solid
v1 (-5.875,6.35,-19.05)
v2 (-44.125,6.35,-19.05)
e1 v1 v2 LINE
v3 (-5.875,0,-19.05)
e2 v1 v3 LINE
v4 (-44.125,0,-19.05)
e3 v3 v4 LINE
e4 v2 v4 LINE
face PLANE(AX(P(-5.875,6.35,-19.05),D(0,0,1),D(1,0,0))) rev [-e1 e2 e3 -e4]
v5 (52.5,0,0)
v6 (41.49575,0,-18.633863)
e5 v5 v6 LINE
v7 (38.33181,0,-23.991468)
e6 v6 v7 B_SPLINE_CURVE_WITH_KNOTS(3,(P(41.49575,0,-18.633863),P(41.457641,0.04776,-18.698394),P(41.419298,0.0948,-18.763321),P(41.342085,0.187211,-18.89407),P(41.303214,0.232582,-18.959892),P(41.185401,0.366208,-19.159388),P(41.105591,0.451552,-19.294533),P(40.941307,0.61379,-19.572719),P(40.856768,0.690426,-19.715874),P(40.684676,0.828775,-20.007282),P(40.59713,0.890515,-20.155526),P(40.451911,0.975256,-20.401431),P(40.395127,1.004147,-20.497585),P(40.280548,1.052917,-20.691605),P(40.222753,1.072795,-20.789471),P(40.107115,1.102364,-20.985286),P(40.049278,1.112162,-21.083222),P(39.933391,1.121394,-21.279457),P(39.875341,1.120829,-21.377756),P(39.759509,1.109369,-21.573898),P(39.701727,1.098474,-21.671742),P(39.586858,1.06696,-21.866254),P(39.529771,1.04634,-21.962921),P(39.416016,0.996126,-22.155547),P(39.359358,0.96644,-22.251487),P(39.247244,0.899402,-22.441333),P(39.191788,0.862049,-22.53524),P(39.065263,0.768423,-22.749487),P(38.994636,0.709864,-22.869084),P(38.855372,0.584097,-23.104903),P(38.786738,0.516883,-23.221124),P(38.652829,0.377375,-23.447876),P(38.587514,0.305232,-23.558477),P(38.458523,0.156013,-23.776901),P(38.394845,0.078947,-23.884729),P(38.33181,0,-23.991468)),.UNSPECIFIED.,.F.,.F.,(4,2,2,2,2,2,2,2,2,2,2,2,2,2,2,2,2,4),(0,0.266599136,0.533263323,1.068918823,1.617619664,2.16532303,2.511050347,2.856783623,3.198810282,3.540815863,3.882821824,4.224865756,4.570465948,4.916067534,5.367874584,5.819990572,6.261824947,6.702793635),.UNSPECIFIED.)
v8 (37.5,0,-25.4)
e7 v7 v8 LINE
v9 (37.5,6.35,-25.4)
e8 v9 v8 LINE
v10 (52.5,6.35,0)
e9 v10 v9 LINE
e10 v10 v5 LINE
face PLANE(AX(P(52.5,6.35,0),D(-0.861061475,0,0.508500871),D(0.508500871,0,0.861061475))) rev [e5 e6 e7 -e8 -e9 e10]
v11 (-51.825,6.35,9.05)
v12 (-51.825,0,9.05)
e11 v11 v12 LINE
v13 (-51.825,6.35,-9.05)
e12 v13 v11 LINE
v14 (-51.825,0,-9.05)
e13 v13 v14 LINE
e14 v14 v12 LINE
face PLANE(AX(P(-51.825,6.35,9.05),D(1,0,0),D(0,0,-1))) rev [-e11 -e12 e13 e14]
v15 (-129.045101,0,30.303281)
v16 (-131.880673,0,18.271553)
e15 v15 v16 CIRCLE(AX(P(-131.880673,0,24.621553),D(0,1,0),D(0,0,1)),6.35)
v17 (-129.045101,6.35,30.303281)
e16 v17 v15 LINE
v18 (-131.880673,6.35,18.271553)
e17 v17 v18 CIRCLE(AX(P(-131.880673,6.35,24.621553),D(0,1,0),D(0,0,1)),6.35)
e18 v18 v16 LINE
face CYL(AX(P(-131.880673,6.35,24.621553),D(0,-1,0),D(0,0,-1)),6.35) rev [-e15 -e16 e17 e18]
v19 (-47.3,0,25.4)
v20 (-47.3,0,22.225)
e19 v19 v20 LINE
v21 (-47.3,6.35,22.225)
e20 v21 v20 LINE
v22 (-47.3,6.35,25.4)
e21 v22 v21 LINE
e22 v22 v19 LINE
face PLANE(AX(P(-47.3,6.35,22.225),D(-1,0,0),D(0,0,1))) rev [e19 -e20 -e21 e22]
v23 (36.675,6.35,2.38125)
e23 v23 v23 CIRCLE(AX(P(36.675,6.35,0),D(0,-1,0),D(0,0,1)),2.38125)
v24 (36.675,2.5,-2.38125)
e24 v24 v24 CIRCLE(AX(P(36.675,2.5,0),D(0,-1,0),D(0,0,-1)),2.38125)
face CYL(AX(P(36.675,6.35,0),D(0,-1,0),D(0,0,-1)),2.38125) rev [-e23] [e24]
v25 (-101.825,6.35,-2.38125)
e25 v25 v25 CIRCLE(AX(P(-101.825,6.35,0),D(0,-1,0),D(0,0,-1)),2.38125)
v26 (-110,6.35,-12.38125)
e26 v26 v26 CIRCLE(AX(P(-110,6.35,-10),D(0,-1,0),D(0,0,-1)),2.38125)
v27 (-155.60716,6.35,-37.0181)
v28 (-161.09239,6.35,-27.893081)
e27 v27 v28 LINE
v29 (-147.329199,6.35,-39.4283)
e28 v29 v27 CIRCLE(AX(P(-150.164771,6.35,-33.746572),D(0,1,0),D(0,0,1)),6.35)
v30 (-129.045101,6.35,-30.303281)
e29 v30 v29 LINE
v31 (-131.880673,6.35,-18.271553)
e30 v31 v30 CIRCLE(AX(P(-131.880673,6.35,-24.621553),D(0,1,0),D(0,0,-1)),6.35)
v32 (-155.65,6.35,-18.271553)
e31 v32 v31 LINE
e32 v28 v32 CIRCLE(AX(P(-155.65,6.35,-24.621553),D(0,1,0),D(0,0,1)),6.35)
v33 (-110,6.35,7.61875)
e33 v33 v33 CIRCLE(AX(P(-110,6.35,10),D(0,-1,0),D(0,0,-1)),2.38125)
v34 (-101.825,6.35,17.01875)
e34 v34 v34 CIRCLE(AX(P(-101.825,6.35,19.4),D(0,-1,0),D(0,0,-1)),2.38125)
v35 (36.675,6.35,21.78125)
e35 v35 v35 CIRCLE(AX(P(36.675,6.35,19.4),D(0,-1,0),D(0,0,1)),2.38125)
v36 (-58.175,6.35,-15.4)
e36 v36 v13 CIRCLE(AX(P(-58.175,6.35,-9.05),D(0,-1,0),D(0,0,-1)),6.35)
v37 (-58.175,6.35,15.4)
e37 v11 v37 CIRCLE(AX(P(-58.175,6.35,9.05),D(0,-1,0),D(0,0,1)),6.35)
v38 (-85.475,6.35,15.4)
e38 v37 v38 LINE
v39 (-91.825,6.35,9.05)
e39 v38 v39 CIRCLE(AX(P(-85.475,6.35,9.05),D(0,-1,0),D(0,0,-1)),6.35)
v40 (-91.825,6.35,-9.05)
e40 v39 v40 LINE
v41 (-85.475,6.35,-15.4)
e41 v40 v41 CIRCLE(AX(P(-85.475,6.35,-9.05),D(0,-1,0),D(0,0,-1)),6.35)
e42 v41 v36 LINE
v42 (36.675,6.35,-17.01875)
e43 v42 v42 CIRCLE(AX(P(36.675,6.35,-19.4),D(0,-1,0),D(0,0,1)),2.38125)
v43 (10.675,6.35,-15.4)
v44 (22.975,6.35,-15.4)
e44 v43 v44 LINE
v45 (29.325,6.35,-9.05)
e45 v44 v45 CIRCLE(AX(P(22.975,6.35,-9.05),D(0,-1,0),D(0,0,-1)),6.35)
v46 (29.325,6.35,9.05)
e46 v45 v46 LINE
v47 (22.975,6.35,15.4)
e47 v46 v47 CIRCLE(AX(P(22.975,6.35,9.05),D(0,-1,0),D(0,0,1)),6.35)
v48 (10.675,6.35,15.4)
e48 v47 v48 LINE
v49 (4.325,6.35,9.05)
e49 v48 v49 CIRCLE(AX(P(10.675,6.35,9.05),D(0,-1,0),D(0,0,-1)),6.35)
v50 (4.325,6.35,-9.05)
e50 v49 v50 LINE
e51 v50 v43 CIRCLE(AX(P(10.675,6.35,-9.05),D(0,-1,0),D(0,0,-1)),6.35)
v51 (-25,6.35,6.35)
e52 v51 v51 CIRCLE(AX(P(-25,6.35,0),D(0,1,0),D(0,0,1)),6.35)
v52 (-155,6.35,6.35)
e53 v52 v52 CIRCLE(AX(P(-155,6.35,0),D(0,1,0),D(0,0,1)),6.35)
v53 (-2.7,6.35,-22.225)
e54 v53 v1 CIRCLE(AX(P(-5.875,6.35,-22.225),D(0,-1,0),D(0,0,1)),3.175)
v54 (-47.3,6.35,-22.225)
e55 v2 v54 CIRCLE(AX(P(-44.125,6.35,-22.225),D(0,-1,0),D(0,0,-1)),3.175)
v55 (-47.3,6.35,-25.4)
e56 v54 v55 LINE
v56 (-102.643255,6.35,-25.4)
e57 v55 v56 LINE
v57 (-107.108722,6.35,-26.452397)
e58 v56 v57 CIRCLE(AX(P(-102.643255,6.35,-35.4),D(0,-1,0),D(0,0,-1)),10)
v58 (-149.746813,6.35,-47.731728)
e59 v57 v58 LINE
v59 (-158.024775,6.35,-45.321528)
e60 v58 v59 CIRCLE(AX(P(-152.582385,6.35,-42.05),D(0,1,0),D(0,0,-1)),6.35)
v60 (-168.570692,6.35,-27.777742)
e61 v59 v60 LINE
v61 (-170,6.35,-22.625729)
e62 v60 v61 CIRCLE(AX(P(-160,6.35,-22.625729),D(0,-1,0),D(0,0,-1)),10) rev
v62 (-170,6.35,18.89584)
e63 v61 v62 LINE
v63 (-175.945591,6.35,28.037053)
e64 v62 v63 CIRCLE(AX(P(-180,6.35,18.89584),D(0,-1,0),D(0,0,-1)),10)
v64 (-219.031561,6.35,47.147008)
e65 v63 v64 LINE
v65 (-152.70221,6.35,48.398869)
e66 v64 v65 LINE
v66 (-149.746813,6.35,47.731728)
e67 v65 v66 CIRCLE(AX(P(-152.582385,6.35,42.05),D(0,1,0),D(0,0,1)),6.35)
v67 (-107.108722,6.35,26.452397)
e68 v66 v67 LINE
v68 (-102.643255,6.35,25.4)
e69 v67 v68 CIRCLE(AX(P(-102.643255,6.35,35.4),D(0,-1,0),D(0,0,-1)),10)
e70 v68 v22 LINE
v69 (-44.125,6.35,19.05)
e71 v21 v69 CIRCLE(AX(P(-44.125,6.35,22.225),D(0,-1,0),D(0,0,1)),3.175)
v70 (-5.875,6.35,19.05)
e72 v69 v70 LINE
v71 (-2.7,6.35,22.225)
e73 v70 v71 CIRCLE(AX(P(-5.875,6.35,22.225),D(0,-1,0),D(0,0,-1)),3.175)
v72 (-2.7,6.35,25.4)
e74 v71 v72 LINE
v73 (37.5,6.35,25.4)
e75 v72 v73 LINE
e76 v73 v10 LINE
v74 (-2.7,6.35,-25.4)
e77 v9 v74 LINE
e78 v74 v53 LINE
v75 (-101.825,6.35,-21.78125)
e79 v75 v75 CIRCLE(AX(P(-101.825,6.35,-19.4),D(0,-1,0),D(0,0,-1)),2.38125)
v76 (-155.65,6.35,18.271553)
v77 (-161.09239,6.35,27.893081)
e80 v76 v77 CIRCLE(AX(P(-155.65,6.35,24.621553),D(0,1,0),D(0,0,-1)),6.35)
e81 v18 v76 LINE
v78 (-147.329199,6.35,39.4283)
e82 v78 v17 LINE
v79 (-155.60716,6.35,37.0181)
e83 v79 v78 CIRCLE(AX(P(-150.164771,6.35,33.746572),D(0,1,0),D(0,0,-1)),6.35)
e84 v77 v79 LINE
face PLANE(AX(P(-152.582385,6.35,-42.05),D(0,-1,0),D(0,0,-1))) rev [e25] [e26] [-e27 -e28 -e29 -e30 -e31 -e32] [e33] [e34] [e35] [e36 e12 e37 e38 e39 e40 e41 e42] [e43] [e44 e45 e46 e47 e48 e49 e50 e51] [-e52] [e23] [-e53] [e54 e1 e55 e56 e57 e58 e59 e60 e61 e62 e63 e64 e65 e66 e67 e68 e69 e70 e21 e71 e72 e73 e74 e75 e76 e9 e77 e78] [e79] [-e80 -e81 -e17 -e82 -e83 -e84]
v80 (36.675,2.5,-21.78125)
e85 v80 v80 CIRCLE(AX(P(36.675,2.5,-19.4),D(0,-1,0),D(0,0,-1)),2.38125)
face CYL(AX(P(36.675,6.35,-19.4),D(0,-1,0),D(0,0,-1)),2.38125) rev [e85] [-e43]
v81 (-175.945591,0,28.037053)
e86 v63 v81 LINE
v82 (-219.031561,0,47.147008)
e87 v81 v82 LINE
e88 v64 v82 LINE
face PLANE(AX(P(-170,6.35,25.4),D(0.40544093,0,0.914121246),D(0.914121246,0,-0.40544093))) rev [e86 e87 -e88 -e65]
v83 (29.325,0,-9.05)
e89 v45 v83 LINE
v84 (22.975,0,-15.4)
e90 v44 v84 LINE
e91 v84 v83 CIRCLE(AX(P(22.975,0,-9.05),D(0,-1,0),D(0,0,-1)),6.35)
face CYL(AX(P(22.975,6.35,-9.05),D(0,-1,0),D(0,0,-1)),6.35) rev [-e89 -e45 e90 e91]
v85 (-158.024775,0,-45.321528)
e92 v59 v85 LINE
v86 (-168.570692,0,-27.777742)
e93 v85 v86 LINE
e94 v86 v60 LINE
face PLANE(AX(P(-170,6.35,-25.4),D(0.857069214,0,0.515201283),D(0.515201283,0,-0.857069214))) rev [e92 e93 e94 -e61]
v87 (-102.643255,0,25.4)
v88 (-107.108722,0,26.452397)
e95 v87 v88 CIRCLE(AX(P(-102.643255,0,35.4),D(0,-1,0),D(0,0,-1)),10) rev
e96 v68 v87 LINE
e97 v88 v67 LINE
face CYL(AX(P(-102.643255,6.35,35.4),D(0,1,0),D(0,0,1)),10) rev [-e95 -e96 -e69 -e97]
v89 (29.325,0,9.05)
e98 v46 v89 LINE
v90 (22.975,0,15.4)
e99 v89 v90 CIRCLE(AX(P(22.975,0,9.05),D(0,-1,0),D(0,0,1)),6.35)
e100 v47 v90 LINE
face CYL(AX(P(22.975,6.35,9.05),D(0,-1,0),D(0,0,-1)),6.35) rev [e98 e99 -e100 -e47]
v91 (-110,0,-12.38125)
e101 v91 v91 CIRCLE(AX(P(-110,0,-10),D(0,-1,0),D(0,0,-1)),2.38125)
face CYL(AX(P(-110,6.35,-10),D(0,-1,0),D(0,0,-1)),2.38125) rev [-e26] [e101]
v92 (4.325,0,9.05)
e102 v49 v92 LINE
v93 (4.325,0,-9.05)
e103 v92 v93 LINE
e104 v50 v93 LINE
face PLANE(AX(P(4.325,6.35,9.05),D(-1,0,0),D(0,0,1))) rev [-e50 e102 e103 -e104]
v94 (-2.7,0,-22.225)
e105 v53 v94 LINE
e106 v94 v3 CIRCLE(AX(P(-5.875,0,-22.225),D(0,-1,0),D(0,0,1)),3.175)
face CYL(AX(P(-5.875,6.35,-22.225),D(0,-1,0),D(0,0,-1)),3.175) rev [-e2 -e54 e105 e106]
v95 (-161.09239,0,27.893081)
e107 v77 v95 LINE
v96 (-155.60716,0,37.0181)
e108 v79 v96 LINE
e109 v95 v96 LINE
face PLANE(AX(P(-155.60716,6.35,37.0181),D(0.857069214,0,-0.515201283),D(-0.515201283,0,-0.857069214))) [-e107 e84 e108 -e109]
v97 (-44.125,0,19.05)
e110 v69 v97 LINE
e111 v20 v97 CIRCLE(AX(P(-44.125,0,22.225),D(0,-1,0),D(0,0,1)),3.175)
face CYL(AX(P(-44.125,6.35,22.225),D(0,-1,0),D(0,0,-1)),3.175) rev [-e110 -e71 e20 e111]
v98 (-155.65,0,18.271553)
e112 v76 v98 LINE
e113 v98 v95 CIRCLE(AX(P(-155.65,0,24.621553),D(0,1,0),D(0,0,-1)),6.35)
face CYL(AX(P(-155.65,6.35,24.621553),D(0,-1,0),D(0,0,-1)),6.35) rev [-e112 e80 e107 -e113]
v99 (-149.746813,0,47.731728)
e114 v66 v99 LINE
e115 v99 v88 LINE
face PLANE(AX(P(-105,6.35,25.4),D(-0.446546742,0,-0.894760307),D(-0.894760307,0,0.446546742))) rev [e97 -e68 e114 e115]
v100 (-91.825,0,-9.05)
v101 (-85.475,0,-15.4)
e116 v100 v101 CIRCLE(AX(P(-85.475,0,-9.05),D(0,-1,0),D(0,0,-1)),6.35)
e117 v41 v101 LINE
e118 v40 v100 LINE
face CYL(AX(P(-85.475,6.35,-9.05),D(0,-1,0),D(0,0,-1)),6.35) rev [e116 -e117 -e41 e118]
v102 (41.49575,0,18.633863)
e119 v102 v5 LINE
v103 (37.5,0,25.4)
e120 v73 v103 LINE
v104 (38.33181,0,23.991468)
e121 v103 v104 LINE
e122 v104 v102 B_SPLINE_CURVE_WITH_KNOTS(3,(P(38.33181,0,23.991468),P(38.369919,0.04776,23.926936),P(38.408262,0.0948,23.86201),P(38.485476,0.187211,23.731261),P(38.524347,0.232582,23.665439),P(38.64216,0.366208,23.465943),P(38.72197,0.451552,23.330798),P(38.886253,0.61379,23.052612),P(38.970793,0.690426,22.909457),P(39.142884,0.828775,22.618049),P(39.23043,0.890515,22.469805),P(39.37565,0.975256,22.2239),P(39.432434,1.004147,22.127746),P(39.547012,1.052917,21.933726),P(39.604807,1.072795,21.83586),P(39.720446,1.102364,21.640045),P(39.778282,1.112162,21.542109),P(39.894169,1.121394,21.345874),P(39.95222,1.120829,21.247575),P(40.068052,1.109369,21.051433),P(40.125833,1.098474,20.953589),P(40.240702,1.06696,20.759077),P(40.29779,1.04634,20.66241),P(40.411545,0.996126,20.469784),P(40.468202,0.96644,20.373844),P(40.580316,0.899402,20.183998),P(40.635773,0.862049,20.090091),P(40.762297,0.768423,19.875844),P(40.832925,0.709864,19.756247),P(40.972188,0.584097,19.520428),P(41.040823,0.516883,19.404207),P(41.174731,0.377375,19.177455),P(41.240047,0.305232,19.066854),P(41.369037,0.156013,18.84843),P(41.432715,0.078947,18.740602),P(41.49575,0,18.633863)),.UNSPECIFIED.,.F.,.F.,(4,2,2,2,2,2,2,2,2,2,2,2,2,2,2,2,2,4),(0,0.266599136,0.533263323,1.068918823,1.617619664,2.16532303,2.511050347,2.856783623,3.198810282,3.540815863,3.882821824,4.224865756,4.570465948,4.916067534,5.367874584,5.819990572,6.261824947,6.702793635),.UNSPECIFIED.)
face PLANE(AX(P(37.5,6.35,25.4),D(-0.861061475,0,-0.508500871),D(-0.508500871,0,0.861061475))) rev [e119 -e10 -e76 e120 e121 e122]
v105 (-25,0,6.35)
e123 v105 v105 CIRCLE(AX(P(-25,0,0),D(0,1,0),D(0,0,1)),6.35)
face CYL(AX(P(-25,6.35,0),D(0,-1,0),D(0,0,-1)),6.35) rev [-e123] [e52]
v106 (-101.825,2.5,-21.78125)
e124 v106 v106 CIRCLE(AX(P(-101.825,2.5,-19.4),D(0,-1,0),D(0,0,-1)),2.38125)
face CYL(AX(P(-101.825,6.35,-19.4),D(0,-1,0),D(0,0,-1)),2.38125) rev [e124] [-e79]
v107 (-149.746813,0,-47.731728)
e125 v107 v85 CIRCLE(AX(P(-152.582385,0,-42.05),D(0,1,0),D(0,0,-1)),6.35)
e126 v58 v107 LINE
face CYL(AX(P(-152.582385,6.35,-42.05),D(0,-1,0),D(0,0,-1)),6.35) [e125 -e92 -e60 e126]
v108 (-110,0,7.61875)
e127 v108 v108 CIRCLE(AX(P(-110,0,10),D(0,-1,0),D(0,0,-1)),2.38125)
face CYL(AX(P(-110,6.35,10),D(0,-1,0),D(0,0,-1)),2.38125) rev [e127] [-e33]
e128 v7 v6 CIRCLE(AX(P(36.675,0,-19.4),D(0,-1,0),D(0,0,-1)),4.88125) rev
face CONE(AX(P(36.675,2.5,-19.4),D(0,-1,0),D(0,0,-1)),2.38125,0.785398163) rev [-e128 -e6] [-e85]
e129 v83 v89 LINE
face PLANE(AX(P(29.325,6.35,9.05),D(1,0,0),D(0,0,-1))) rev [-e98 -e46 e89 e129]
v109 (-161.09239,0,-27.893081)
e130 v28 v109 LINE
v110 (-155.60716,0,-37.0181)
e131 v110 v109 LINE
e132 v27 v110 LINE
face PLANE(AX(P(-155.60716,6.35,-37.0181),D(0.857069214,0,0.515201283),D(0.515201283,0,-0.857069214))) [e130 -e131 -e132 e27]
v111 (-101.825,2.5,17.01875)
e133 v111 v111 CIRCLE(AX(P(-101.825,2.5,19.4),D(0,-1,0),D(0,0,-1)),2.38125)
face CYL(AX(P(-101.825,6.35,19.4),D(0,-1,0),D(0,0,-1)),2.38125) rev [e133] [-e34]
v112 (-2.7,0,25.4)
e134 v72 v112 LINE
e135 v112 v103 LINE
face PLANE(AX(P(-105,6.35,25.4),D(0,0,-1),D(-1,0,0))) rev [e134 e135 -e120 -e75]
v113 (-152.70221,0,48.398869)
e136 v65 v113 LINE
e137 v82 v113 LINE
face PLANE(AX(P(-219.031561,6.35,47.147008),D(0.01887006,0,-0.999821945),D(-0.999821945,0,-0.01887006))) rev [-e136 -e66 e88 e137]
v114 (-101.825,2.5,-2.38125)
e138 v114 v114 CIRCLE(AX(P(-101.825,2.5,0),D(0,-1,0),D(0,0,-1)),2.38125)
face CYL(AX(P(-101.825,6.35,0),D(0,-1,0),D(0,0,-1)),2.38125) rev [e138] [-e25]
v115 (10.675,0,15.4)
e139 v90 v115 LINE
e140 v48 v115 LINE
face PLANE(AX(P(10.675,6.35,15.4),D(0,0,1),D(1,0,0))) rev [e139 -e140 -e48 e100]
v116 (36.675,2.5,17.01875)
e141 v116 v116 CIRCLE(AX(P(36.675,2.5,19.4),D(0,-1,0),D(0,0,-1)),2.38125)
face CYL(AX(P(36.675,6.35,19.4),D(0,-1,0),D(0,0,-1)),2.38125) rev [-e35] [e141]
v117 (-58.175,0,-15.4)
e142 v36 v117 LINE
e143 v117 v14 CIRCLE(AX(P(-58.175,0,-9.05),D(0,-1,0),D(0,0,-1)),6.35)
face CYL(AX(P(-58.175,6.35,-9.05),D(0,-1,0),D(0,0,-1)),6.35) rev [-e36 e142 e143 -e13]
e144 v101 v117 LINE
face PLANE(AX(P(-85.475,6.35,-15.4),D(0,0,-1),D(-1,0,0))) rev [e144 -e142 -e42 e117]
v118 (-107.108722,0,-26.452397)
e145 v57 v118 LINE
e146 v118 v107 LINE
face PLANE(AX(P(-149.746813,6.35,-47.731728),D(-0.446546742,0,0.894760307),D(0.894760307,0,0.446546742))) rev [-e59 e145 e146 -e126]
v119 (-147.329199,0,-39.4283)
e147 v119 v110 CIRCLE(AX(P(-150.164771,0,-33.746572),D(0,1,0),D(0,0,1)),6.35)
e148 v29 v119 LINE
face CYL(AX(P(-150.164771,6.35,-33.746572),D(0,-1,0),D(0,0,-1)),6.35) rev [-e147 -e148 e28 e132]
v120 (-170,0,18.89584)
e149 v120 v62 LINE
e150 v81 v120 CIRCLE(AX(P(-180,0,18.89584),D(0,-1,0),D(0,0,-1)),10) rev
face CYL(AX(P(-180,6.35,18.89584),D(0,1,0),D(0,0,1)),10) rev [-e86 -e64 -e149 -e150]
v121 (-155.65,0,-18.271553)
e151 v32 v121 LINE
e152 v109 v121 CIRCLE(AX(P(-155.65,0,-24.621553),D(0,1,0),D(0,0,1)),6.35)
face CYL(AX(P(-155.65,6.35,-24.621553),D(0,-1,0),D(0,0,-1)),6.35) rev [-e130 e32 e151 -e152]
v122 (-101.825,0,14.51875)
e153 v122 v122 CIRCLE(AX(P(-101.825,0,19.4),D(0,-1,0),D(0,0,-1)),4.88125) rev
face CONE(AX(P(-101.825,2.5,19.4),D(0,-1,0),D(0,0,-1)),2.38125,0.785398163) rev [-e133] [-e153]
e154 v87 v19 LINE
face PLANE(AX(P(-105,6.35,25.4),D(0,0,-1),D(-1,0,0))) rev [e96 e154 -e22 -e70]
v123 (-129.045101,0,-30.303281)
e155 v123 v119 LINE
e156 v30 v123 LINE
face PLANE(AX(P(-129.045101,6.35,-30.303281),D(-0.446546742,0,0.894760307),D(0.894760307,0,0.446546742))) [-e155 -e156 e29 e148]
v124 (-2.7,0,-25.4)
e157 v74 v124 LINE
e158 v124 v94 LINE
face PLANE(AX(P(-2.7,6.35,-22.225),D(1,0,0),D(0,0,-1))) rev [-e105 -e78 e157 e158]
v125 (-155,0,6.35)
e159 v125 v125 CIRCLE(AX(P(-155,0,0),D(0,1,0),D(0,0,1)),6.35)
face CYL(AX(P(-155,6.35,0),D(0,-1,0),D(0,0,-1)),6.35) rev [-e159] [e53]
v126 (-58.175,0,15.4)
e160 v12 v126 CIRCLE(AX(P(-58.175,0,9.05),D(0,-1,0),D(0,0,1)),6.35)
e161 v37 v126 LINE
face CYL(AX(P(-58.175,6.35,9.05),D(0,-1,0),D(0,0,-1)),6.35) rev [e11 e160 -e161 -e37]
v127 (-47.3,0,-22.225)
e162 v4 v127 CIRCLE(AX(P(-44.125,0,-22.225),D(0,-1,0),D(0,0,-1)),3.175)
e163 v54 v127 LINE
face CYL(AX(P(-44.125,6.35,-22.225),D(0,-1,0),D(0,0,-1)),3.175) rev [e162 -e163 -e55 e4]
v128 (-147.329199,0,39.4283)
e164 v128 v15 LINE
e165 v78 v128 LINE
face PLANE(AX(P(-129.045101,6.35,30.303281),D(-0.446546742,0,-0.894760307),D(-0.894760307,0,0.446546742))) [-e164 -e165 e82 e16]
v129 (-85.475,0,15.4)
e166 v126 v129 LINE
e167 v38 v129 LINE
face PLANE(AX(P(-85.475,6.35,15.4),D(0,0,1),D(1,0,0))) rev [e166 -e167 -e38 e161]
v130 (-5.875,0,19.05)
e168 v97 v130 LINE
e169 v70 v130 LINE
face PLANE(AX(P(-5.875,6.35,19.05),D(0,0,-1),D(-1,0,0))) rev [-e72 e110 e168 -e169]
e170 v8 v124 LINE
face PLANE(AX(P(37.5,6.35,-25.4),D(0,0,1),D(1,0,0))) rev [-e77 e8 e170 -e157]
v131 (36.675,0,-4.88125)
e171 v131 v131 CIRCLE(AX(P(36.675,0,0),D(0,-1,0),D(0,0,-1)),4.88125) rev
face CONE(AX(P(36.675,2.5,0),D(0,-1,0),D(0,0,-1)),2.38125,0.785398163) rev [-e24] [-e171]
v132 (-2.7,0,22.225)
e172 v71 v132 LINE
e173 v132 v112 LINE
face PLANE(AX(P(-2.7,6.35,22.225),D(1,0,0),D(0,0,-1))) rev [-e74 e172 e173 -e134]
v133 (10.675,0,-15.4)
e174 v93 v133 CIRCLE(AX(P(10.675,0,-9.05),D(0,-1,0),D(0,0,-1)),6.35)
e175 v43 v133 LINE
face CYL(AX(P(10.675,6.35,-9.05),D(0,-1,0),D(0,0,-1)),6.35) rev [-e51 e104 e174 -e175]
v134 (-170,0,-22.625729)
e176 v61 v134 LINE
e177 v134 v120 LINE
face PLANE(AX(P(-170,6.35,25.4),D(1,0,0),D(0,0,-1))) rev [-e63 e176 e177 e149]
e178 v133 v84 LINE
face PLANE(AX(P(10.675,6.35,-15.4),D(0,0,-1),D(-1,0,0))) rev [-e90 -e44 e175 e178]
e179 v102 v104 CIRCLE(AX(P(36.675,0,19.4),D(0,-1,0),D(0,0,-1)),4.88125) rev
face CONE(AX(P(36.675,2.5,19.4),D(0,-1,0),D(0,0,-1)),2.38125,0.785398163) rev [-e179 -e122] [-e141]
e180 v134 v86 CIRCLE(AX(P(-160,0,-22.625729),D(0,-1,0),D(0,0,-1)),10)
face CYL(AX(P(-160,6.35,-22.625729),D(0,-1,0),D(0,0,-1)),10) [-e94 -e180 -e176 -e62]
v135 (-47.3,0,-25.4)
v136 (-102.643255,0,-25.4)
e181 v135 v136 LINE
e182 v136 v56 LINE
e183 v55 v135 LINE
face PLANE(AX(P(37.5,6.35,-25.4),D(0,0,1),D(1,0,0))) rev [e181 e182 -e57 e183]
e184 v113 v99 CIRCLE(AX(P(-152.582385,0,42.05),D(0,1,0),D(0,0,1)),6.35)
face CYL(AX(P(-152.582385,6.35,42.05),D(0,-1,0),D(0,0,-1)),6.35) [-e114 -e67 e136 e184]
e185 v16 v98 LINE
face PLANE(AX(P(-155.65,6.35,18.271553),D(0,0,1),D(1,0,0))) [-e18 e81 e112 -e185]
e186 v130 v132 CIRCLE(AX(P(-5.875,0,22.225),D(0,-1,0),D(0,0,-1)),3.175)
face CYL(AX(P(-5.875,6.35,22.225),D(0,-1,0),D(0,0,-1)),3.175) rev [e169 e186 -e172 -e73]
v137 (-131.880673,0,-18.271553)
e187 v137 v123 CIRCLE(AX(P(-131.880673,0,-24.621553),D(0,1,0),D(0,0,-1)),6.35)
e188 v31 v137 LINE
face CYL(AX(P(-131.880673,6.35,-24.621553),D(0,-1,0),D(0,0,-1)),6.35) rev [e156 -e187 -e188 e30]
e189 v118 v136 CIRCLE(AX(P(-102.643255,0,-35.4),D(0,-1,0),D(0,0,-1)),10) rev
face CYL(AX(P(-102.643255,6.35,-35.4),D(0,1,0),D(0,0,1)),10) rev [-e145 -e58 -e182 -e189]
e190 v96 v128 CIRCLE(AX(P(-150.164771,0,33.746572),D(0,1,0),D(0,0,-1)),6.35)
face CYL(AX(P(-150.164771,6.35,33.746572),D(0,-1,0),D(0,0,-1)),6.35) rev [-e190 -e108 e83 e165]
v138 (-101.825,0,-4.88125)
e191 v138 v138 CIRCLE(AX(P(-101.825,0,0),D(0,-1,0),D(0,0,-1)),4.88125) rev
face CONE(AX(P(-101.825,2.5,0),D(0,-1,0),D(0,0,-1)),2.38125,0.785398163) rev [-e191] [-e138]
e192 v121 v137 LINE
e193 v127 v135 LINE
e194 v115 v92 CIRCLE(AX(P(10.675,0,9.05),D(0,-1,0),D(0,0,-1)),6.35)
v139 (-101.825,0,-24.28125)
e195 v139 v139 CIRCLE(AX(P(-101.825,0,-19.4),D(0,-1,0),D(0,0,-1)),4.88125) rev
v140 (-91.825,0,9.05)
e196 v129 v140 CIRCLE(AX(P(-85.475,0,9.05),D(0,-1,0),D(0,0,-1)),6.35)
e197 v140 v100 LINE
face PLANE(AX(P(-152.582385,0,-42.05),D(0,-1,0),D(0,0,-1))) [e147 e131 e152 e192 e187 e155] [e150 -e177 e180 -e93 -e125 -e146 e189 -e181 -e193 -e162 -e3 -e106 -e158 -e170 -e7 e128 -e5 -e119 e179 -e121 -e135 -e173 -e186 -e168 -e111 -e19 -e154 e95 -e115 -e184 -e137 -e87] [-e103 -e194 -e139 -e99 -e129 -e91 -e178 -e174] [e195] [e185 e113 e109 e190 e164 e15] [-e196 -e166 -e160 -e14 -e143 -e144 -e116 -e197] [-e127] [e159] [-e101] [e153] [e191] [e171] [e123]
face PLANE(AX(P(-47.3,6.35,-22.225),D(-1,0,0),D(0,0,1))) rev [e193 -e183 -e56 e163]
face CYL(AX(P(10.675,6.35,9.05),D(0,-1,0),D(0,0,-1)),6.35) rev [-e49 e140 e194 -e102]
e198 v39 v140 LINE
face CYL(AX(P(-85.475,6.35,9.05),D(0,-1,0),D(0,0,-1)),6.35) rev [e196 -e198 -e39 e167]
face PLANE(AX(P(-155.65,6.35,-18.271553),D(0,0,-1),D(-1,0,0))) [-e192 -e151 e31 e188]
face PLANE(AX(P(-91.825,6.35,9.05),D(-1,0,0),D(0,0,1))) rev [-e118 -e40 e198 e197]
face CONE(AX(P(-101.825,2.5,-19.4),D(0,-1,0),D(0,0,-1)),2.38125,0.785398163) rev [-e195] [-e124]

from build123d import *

# Parameters (mm, degrees)
CROQUIS1_R              = 6.35
SALIENTE_EXTRUIR1_DEPTH = 6.35
REDONDEO1_R             = 10
CORTAR_EXTRUIR2_DEPTH   = 225.405229946
CORTAR_EXTRUIR3_DEPTH   = 225.405229946
CROQUIS7_R              = 2.38125
CORTAR_EXTRUIR4_DEPTH   = 225.405229946
CROQUIS8_R              = 2.38125
CORTAR_EXTRUIR5_DEPTH   = 225.405229946
CHAFL_N1_SIZE           = 2.5


with BuildPart() as part:
    # Croquis1 → Saliente-Extruir1 (new body)
    with BuildSketch(Plane(origin=(0, 0, 0), x_dir=(1, 0, 0), z_dir=(0, 1, 0))):
        with BuildLine():
            Line((37.5, -25.4), (52.5, 0))
            Line((52.5, 0), (37.5, 25.4))
            Line((37.5, 25.4), (-105, 25.4))
            Line((-105, 25.4), (-149.746813481, 47.731727951))
            ThreePointArc((-149.746813481, 47.731727951), (-154.357530471, 48.146831931), (-158.024774803, 45.321528145))
            Line((-158.024774803, 45.321528145), (-170, 25.4))
            Line((-170, 25.4), (-170, -25.4))
            Line((-170, -25.4), (-219.03156103, -47.147007635))
            Line((-219.03156103, -47.147007635), (-152.702210171, -48.398869348))
            ThreePointArc((-152.702210171, -48.398869348), (-151.184140049, -48.244143221), (-149.746813481, -47.731727951))
            Line((-149.746813481, -47.731727951), (-105, -25.4))
            Line((-105, -25.4), (37.5, -25.4))
        make_face()
        with Locations(Location((-155, 0, 0), (0, 0, 270))):
            Circle(CROQUIS1_R, mode=Mode.SUBTRACT)
        with Locations(Location((-25, 0, 0), (0, 0, 270))):
            Circle(CROQUIS1_R, mode=Mode.SUBTRACT)
        with BuildLine():
            Line((-129.045100716, 30.303281185), (-147.329198773, 39.428299747))
            ThreePointArc((-147.329198773, 39.428299747), (-151.939915763, 39.843403727), (-155.607160095, 37.018099941))
            Line((-155.607160095, 37.018099941), (-161.092389512, 27.893081378))
            ThreePointArc((-161.092389512, 27.893081378), (-161.177056347, 21.495189828), (-155.65, 18.271553233))
            Line((-155.65, 18.271553233), (-131.880672526, 18.271553233))
            ThreePointArc((-131.880672526, 18.271553233), (-125.699998109, 23.164925706), (-129.045100716, 30.303281185))
        make_face(mode=Mode.SUBTRACT)
        with BuildLine():
            Line((-129.045100716, -30.303281185), (-147.329198773, -39.428299747))
            ThreePointArc((-147.329198773, -39.428299747), (-151.939915763, -39.843403727), (-155.607160095, -37.018099941))
            Line((-155.607160095, -37.018099941), (-161.092389512, -27.893081378))
            ThreePointArc((-161.092389512, -27.893081378), (-161.177056347, -21.495189828), (-155.65, -18.271553233))
            Line((-155.65, -18.271553233), (-131.880672526, -18.271553233))
            ThreePointArc((-131.880672526, -18.271553233), (-125.699998109, -23.164925706), (-129.045100716, -30.303281185))
        make_face(mode=Mode.SUBTRACT)
    extrude(amount=SALIENTE_EXTRUIR1_DEPTH)

    # Redondeo1
    redondeo1_edges = [part.edges().sort_by_distance(p)[0] for p in [
        (-105, 3.175, -25.4),
        (-170, 3.175, -25.4),
        (-170, 3.175, 25.4),
        (-105, 3.175, 25.4),
    ]]
    fillet(redondeo1_edges, radius=REDONDEO1_R)

    # Croquis5 → Cortar-Extruir2 (cut, through all)
    with BuildSketch(Plane.XZ):
        with BuildLine():
            Line((-5.875, 19.05), (-44.125, 19.05))
            ThreePointArc((-44.125, 19.05), (-46.37006403, 19.97993597), (-47.3, 22.225))
            Line((-47.3, 22.225), (-47.3, 25.4))
            Line((-47.3, 25.4), (-44.125, 25.4))
            Line((-44.125, 25.4), (-5.875, 25.4))
            Line((-5.875, 25.4), (-2.7, 25.4))
            Line((-2.7, 25.4), (-2.7, 22.225))
            ThreePointArc((-2.7, 22.225), (-3.62993597, 19.97993597), (-5.875, 19.05))
        make_face()
        with BuildLine():
            Line((-5.875, -19.05), (-44.125, -19.05))
            ThreePointArc((-44.125, -19.05), (-46.37006403, -19.97993597), (-47.3, -22.225))
            Line((-47.3, -22.225), (-47.3, -25.4))
            Line((-47.3, -25.4), (-44.125, -25.4))
            Line((-44.125, -25.4), (-5.875, -25.4))
            Line((-5.875, -25.4), (-2.7, -25.4))
            Line((-2.7, -25.4), (-2.7, -22.225))
            ThreePointArc((-2.7, -22.225), (-3.62993597, -19.97993597), (-5.875, -19.05))
        make_face()
    extrude(amount=-CORTAR_EXTRUIR2_DEPTH, mode=Mode.SUBTRACT)

    # Croquis6 → Cortar-Extruir3 (cut, through all)
    with BuildSketch(Plane.XZ):
        with BuildLine():
            Line((-85.475, 15.4), (-58.175, 15.4))
            ThreePointArc((-58.175, 15.4), (-53.684871939, 13.540128061), (-51.825, 9.05))
            Line((-51.825, 9.05), (-51.825, -9.05))
            ThreePointArc((-51.825, -9.05), (-53.684871939, -13.540128061), (-58.175, -15.4))
            Line((-58.175, -15.4), (-85.475, -15.4))
            ThreePointArc((-85.475, -15.4), (-89.965128061, -13.540128061), (-91.825, -9.05))
            Line((-91.825, -9.05), (-91.825, 9.05))
            ThreePointArc((-91.825, 9.05), (-89.965128061, 13.540128061), (-85.475, 15.4))
        make_face()
        with BuildLine():
            Line((10.675, 15.4), (22.975, 15.4))
            ThreePointArc((22.975, 15.4), (27.465128061, 13.540128061), (29.325, 9.05))
            Line((29.325, 9.05), (29.325, -9.05))
            ThreePointArc((29.325, -9.05), (27.465128061, -13.540128061), (22.975, -15.4))
            Line((22.975, -15.4), (10.675, -15.4))
            ThreePointArc((10.675, -15.4), (6.184871939, -13.540128061), (4.325, -9.05))
            Line((4.325, -9.05), (4.325, 9.05))
            ThreePointArc((4.325, 9.05), (6.184871939, 13.540128061), (10.675, 15.4))
        make_face()
    extrude(amount=-CORTAR_EXTRUIR3_DEPTH, mode=Mode.SUBTRACT)

    # Croquis7 → Cortar-Extruir4 (cut, through all)
    with BuildSketch(Plane.XZ):
        with Locations(Location((-101.825, 0, 0), (0, 0, 270))):
            Circle(CROQUIS7_R)
        with Locations(Location((-101.825, 19.4, 0), (0, 0, 270))):
            Circle(CROQUIS7_R)
        with Locations(Location((-101.825, -19.4, 0), (0, 0, 270))):
            Circle(CROQUIS7_R)
        with Locations(Location((36.675, -19.4, 0), (0, 0, 270))):
            Circle(CROQUIS7_R)
        with Locations(Location((36.675, 19.4, 0), (0, 0, 270))):
            Circle(CROQUIS7_R)
        with Locations(Location((36.675, 0, 0), (0, 0, 270))):
            Circle(CROQUIS7_R)
    extrude(amount=-CORTAR_EXTRUIR4_DEPTH, mode=Mode.SUBTRACT)

    # Croquis8 → Cortar-Extruir5 (cut, through all)
    with BuildSketch(Plane.XZ):
        with Locations(Location((-110, -10, 0), (0, 0, 270))):
            Circle(CROQUIS8_R)
        with Locations(Location((-110, 10, 0), (0, 0, 270))):
            Circle(CROQUIS8_R)
    extrude(amount=-CORTAR_EXTRUIR5_DEPTH, mode=Mode.SUBTRACT)

    # Chaflán1
    # the kernel refuses this chamfer: 2.5 mm, written as the material it takes off along each edge
    with BuildSketch(Plane(origin=(-101.825, 0, 19.4), x_dir=(0, 0, -1), z_dir=(-1, 0, 0))) as chafl_n1_piece_1:
        Polygon((2.38125 + CHAFL_N1_SIZE, 0), (2.38125, -CHAFL_N1_SIZE), (2.38125, 0), align=None)
    revolve(axis=Axis((-101.825, 0, 19.4), (0, -1, 0)), mode=Mode.SUBTRACT)
    with BuildSketch(Plane(origin=(36.675, 0, 19.4), x_dir=(0, 0, -1), z_dir=(-1, 0, 0))) as chafl_n1_piece_2:
        Polygon((2.38125 + CHAFL_N1_SIZE, 0), (2.38125, -CHAFL_N1_SIZE), (2.38125, 0), align=None)
    revolve(axis=Axis((36.675, 0, 19.4), (0, -1, 0)), mode=Mode.SUBTRACT)
    with BuildSketch(Plane(origin=(-101.825, 0, 0), x_dir=(0, 0, -1), z_dir=(-1, 0, 0))) as chafl_n1_piece_3:
        Polygon((2.38125 + CHAFL_N1_SIZE, 0), (2.38125, -CHAFL_N1_SIZE), (2.38125, 0), align=None)
    revolve(axis=Axis((-101.825, 0, 0), (0, -1, 0)), mode=Mode.SUBTRACT)
    with BuildSketch(Plane(origin=(-101.825, 0, -19.4), x_dir=(0, 0, -1), z_dir=(-1, 0, 0))) as chafl_n1_piece_4:
        Polygon((2.38125 + CHAFL_N1_SIZE, 0), (2.38125, -CHAFL_N1_SIZE), (2.38125, 0), align=None)
    revolve(axis=Axis((-101.825, 0, -19.4), (0, -1, 0)), mode=Mode.SUBTRACT)
    with BuildSketch(Plane(origin=(36.675, 0, 0), x_dir=(0, 0, -1), z_dir=(-1, 0, 0))) as chafl_n1_piece_5:
        Polygon((2.38125 + CHAFL_N1_SIZE, 0), (2.38125, -CHAFL_N1_SIZE), (2.38125, 0), align=None)
    revolve(axis=Axis((36.675, 0, 0), (0, -1, 0)), mode=Mode.SUBTRACT)
    with BuildSketch(Plane(origin=(36.675, 0, -19.4), x_dir=(0, 0, -1), z_dir=(-1, 0, 0))) as chafl_n1_piece_6:
        Polygon((2.38125 + CHAFL_N1_SIZE, 0), (2.38125, -CHAFL_N1_SIZE), (2.38125, 0), align=None)
    revolve(axis=Axis((36.675, 0, -19.4), (0, -1, 0)), mode=Mode.SUBTRACT)


solid = part.part
